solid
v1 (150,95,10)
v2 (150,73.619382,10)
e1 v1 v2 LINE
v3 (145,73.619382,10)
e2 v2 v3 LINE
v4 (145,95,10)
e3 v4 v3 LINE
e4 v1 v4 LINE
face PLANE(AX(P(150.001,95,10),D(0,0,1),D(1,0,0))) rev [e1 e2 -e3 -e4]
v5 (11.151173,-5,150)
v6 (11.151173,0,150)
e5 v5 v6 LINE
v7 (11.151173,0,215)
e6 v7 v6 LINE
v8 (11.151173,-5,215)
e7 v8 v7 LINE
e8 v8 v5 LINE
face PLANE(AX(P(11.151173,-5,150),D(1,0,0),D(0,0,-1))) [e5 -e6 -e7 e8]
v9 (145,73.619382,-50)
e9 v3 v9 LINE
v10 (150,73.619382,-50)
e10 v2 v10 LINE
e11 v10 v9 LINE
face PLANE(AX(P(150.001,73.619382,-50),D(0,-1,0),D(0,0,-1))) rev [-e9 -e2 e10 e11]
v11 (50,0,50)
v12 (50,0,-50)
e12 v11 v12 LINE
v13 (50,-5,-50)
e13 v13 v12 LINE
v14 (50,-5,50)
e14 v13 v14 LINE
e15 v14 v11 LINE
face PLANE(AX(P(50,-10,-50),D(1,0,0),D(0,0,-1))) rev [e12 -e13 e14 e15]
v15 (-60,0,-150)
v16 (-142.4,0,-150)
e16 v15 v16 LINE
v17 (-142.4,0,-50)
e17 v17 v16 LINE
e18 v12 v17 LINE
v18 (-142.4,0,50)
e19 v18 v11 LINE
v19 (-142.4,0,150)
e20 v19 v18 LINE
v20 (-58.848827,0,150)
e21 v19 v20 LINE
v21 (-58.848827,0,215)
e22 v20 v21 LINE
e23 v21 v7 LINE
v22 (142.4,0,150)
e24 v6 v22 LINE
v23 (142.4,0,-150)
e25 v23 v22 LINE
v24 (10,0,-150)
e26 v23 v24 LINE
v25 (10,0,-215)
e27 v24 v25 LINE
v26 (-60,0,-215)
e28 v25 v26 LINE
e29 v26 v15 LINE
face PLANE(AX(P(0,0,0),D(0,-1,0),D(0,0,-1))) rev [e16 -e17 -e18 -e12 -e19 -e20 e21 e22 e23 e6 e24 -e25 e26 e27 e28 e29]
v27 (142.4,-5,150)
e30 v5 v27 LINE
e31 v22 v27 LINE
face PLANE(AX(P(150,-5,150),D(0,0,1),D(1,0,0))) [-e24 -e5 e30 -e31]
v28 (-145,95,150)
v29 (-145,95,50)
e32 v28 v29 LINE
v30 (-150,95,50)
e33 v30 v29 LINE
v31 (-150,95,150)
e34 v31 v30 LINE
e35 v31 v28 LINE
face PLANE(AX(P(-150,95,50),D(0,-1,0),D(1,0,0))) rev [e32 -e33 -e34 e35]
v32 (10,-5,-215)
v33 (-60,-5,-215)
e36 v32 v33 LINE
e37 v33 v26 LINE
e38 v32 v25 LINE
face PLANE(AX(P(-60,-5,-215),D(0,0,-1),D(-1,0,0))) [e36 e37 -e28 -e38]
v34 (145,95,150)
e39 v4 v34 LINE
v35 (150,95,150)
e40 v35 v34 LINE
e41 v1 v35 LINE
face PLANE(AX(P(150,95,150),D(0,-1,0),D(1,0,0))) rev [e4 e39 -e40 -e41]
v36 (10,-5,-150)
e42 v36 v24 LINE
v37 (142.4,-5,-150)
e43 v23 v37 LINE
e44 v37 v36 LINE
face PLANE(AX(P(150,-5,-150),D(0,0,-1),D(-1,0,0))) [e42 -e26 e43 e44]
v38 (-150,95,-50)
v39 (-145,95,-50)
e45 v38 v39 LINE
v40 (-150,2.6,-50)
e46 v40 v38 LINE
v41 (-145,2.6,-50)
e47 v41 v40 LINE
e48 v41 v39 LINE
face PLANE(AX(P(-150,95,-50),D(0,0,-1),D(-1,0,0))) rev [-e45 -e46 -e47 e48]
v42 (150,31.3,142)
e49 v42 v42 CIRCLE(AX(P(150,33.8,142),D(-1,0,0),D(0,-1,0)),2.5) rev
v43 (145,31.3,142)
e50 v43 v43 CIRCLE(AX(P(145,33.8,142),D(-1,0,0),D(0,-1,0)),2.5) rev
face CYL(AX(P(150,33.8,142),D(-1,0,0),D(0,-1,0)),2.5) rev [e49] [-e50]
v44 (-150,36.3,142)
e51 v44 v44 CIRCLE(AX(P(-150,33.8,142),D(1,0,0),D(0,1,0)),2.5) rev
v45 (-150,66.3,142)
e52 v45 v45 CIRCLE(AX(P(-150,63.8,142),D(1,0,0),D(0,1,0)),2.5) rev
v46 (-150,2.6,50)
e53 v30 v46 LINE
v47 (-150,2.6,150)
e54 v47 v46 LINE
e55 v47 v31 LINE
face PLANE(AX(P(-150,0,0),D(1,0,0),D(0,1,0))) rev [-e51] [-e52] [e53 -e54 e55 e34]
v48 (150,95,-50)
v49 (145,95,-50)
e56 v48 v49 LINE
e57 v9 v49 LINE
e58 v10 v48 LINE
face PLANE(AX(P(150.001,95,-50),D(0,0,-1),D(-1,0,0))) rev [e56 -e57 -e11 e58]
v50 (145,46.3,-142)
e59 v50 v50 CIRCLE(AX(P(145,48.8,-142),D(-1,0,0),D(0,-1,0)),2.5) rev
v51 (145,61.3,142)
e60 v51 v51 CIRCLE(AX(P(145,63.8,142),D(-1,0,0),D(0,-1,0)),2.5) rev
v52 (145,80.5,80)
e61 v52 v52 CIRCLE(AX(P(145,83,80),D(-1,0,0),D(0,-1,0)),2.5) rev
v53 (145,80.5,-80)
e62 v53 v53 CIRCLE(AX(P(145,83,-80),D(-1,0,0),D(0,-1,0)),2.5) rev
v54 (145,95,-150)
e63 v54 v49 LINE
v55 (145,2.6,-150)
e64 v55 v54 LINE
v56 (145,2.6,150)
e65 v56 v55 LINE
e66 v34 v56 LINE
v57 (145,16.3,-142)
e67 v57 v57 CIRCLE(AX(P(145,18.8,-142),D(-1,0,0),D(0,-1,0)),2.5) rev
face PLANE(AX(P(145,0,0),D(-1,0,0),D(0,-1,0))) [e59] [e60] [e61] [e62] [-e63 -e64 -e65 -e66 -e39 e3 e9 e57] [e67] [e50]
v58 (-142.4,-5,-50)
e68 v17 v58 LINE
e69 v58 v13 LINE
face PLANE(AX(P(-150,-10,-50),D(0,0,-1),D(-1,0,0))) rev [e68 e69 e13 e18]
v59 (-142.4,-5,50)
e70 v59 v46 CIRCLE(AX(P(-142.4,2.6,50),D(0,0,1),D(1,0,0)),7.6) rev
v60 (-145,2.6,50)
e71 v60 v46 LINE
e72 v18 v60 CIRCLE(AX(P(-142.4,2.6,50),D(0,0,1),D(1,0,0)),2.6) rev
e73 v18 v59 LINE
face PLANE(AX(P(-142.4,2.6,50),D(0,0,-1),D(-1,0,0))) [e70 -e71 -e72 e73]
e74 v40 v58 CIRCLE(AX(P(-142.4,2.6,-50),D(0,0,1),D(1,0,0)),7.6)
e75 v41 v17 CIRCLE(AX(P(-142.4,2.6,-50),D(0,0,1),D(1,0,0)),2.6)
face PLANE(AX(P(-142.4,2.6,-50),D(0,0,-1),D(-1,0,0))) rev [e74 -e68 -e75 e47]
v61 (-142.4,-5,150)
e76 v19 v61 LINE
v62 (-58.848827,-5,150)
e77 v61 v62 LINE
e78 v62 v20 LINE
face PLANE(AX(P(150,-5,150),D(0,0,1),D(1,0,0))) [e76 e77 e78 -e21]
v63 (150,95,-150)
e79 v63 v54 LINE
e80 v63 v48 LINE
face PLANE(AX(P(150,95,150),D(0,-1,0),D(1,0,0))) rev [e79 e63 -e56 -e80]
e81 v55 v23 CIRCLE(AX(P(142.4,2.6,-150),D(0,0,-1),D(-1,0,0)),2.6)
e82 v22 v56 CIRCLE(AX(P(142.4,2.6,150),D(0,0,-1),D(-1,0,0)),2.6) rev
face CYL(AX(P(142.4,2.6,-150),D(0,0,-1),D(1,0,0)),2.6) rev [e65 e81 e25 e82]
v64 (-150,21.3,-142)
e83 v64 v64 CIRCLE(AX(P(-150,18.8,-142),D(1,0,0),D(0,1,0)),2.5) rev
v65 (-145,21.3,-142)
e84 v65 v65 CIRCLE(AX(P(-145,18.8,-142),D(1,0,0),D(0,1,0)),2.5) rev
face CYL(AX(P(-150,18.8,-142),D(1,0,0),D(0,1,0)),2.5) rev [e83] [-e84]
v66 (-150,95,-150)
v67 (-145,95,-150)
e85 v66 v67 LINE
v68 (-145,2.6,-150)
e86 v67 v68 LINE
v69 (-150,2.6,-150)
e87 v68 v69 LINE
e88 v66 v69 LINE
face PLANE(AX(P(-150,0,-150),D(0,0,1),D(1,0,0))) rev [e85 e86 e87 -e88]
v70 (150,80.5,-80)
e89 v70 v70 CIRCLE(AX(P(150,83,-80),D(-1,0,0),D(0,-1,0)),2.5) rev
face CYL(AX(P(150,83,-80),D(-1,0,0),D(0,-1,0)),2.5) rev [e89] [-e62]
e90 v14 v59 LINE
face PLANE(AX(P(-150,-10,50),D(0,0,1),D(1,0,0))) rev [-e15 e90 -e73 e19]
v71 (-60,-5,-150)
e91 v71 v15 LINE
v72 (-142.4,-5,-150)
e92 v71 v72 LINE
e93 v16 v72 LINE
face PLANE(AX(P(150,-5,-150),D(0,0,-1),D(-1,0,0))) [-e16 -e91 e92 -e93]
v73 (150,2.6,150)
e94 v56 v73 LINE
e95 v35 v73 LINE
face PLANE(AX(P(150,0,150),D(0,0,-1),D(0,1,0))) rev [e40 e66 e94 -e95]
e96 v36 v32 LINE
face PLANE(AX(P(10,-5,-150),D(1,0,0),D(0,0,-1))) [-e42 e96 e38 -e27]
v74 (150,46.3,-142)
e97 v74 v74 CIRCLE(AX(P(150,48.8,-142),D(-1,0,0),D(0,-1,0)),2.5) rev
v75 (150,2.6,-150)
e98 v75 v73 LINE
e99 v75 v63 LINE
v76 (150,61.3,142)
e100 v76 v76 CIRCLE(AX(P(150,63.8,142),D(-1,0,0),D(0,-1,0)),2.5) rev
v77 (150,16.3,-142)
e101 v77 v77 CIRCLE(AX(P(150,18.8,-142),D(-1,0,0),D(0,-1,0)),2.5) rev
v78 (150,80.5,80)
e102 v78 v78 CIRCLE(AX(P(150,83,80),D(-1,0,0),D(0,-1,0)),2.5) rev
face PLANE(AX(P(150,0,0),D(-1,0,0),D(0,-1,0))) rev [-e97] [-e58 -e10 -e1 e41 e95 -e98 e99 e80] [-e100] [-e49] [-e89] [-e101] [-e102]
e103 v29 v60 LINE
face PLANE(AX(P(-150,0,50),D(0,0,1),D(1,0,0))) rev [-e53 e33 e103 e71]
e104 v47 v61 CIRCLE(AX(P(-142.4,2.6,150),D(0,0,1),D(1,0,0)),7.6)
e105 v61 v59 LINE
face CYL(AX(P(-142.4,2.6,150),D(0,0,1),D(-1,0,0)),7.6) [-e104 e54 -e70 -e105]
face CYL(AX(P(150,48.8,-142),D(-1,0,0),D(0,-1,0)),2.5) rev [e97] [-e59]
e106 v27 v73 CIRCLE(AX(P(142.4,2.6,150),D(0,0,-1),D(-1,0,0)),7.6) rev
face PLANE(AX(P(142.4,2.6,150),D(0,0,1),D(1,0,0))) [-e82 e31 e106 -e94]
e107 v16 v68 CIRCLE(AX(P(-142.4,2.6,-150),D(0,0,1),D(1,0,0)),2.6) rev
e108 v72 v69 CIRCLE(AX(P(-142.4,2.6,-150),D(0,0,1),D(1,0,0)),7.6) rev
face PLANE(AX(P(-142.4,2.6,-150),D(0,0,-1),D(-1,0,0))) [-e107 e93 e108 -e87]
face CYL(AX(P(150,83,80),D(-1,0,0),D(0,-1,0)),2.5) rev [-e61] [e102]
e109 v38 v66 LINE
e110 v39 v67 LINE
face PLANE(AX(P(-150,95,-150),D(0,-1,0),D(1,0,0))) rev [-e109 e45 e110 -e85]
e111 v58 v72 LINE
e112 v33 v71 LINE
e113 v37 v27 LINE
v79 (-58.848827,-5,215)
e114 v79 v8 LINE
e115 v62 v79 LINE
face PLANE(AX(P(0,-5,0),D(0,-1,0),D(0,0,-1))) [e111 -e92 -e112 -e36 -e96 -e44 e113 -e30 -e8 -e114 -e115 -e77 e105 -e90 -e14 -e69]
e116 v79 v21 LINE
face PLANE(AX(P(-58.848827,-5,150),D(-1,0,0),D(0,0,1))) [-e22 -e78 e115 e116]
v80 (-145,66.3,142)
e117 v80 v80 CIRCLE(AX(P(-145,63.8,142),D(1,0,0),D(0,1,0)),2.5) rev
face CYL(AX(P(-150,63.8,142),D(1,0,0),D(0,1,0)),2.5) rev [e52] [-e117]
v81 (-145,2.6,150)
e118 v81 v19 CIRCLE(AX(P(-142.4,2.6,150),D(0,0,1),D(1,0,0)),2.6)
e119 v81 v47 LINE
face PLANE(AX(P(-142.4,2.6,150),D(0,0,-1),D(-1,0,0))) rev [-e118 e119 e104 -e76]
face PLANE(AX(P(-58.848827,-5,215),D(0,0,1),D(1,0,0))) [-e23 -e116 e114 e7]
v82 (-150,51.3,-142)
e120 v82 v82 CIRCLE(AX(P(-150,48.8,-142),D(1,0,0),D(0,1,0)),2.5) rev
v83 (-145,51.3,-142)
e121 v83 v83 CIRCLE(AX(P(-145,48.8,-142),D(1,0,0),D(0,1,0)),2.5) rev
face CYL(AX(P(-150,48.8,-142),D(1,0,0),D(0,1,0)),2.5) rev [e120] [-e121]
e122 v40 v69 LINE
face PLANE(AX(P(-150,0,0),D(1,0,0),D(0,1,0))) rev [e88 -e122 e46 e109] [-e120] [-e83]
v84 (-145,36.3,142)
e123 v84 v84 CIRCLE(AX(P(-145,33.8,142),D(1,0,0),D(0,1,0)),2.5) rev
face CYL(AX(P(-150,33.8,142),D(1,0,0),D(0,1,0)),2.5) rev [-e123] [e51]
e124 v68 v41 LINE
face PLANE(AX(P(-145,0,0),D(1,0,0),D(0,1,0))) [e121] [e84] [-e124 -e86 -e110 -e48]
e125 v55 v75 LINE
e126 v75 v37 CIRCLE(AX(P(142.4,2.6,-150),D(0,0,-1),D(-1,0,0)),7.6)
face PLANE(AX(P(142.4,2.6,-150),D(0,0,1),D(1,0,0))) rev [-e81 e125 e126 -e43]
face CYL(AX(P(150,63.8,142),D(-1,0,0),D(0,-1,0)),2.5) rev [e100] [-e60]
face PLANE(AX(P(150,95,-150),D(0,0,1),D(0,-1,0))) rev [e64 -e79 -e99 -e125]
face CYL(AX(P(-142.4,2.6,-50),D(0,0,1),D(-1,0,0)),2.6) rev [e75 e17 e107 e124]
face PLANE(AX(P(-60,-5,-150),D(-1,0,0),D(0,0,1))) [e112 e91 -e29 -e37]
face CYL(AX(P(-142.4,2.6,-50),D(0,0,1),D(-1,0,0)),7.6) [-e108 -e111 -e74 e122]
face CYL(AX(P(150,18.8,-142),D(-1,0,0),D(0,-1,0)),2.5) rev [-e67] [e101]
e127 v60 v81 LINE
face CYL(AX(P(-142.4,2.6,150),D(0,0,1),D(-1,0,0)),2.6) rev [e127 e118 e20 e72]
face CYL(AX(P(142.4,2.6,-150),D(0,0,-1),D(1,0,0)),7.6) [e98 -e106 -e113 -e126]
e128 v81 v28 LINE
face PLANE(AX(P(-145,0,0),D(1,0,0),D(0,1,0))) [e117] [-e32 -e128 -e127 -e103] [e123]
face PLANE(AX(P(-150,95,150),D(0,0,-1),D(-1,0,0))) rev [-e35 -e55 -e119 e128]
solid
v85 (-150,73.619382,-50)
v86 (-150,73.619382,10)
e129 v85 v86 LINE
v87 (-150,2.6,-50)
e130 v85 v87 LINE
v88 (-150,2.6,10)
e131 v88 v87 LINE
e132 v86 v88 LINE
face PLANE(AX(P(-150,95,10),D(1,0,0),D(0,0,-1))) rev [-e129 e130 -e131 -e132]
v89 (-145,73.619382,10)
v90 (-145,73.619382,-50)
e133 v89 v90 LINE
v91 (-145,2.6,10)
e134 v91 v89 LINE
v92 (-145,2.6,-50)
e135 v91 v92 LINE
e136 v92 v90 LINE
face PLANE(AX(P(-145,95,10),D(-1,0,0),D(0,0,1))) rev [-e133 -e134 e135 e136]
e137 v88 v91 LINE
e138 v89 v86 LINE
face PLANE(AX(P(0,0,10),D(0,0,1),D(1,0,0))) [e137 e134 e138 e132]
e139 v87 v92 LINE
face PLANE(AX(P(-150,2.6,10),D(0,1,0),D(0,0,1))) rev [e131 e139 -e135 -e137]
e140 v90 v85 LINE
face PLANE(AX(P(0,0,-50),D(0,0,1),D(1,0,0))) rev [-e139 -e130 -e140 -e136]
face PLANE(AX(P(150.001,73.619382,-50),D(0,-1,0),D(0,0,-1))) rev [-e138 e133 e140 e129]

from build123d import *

# Parameters (mm, degrees)
SKETCH1_W                    = 300
SKETCH1_H                    = 300
BASE_FLANGE1_DEPTH           = 5
EDGE_FLANGE1_STRIP_W         = 25.2
EDGE_FLANGE1_STRIP_H         = 5
EDGE_FLANGE1_STRIP_CUT_DEPTH = 300
EDGE_FLANGE1_DEPTH           = 300
EDGE_FLANGE1_PROFILE_W       = 300
EDGE_FLANGE1_PROFILE_H       = 92.4
EDGE_FLANGE1_PROFILE_R       = 2.5
EDGE_FLANGE1_FLAT_DEPTH      = 5
SKETCH9_W                    = 200
SKETCH9_H                    = 100
CUT_EXTRUDE1_DEPTH           = 10
SKETCH16_W                   = 70
SKETCH16_H                   = 65
TAB2_DEPTH                   = 5
EDGE_FLANGE3_STRIP_W         = 25.2
EDGE_FLANGE3_STRIP_H         = 5
EDGE_FLANGE3_STRIP_CUT_DEPTH = 100
EDGE_FLANGE3_DEPTH           = 100
EDGE_FLANGE3_PROFILE_W       = 100
EDGE_FLANGE3_PROFILE_H       = 92.4
EDGE_FLANGE3_PROFILE_R       = 2.5
EDGE_FLANGE3_FLAT_DEPTH      = 5
EDGE_FLANGE4_STRIP_W         = 25.2
EDGE_FLANGE4_STRIP_H         = 5
EDGE_FLANGE4_STRIP_CUT_DEPTH = 100
EDGE_FLANGE4_DEPTH           = 100
EDGE_FLANGE4_PROFILE_W       = 100
EDGE_FLANGE4_PROFILE_H       = 92.4
EDGE_FLANGE4_PROFILE_R       = 2.5
EDGE_FLANGE4_FLAT_DEPTH      = 5
SKETCH37_W                   = 5
SKETCH37_H                   = 92.4
BASE_FLANGE2_DEPTH           = 60
CUT_EXTRUDE2_DEPTH           = 5
CUT_EXTRUDE3_START           = -300
SKETCH41_W                   = 60
SKETCH41_H                   = 21.380618099
CUT_EXTRUDE3_DEPTH           = 300


# Sheet-metal steps are written as plain solids
with BuildPart() as part:
    # Sketch1 → Base-Flange1 (new body)
    with BuildSketch(Plane(origin=(0, 0, 0), x_dir=(1, 0, 0), z_dir=(0, 1, 0))):
        Rectangle(SKETCH1_W, SKETCH1_H)
    extrude(amount=-BASE_FLANGE1_DEPTH)

    # Edge-Flange1 strip (across the edge) → Edge-Flange1 strip cut (cut)
    with BuildSketch(Plane(origin=(150, 0, 150), x_dir=(-1, 0, 0), z_dir=(0, 0, -1))):
        with Locations((-5, -2.5)):
            Rectangle(EDGE_FLANGE1_STRIP_W, EDGE_FLANGE1_STRIP_H)
    extrude(amount=EDGE_FLANGE1_STRIP_CUT_DEPTH, mode=Mode.SUBTRACT)

    # Edge-Flange1 bend section (across the edge) → Edge-Flange1 (add)
    with BuildSketch(Plane(origin=(150, 0, 150), x_dir=(-1, 0, 0), z_dir=(0, 0, -1))):
        with BuildLine():
            Line((0, 2.6), (5, 2.6))
            ThreePointArc((5, 2.6), (5.761522369, 0.761522369), (7.6, 0))
            Line((7.6, 0), (7.6, -5))
            ThreePointArc((7.6, -5), (2.225988463, -2.774011537), (0, 2.6))
        make_face()
    extrude(amount=EDGE_FLANGE1_DEPTH)

    # Edge-Flange1 profile (on flange) → Edge-Flange1 flat (add)
    with BuildSketch(Plane(origin=(150, 0, 0), x_dir=(0, 0, -1), z_dir=(1, 0, 0))):
        with Locations((0, 48.8)):
            Rectangle(EDGE_FLANGE1_PROFILE_W, EDGE_FLANGE1_PROFILE_H)
        with Locations((-142, 33.8)):
            Circle(EDGE_FLANGE1_PROFILE_R, mode=Mode.SUBTRACT)
        with Locations((142, 18.8)):
            Circle(EDGE_FLANGE1_PROFILE_R, mode=Mode.SUBTRACT)
        with Locations((142, 48.8)):
            Circle(EDGE_FLANGE1_PROFILE_R, mode=Mode.SUBTRACT)
        with Locations((-142, 63.8)):
            Circle(EDGE_FLANGE1_PROFILE_R, mode=Mode.SUBTRACT)
        with Locations((-80, 83)):
            Circle(EDGE_FLANGE1_PROFILE_R, mode=Mode.SUBTRACT)
        with Locations((80, 83)):
            Circle(EDGE_FLANGE1_PROFILE_R, mode=Mode.SUBTRACT)
    extrude(amount=-EDGE_FLANGE1_FLAT_DEPTH)

    # Sketch9 → Cut-Extrude1 (cut)
    with BuildSketch(Plane(origin=(0, 0, 0), x_dir=(1, 0, 0), z_dir=(0, 1, 0))):
        with Locations((-50, 0)):
            Rectangle(SKETCH9_W, SKETCH9_H)
    extrude(amount=-CUT_EXTRUDE1_DEPTH, mode=Mode.SUBTRACT)

    # Sketch16 → Tab2 (add)
    with BuildSketch(Plane(origin=(0, 0, 0), x_dir=(1, 0, 0), z_dir=(0, 1, 0))):
        with Locations((-25, 182.5)):
            Rectangle(SKETCH16_W, SKETCH16_H)
        with Locations((-23.848827091, -182.5)):
            Rectangle(SKETCH16_W, SKETCH16_H)
    extrude(amount=-TAB2_DEPTH)

    # Edge-Flange3 strip (across the edge) → Edge-Flange3 strip cut (cut)
    with BuildSketch(Plane(origin=(-150, 0, 50), x_dir=(1, 0, 0), z_dir=(0, 0, 1))):
        with Locations((-5, -2.5)):
            Rectangle(EDGE_FLANGE3_STRIP_W, EDGE_FLANGE3_STRIP_H)
    extrude(amount=EDGE_FLANGE3_STRIP_CUT_DEPTH, mode=Mode.SUBTRACT)

    # Edge-Flange3 bend section (across the edge) → Edge-Flange3 (add)
    with BuildSketch(Plane(origin=(-150, 0, 50), x_dir=(1, 0, 0), z_dir=(0, 0, 1))):
        with BuildLine():
            Line((0, 2.6), (5, 2.6))
            ThreePointArc((5, 2.6), (5.761522369, 0.761522369), (7.6, 0))
            Line((7.6, 0), (7.6, -5))
            ThreePointArc((7.6, -5), (2.225988463, -2.774011537), (0, 2.6))
        make_face()
    extrude(amount=EDGE_FLANGE3_DEPTH)

    # Edge-Flange3 profile (on flange) → Edge-Flange3 flat (add)
    with BuildSketch(Plane.ZY.offset(150)):
        with Locations((100, 48.8)):
            Rectangle(EDGE_FLANGE3_PROFILE_W, EDGE_FLANGE3_PROFILE_H)
        with Locations((142, 33.8)):
            Circle(EDGE_FLANGE3_PROFILE_R, mode=Mode.SUBTRACT)
        with Locations((142, 63.8)):
            Circle(EDGE_FLANGE3_PROFILE_R, mode=Mode.SUBTRACT)
    extrude(amount=-EDGE_FLANGE3_FLAT_DEPTH)

    # Edge-Flange4 strip (across the edge) → Edge-Flange4 strip cut (cut)
    with BuildSketch(Plane(origin=(-150, 0, -150), x_dir=(1, 0, 0), z_dir=(0, 0, 1))):
        with Locations((-5, -2.5)):
            Rectangle(EDGE_FLANGE4_STRIP_W, EDGE_FLANGE4_STRIP_H)
    extrude(amount=EDGE_FLANGE4_STRIP_CUT_DEPTH, mode=Mode.SUBTRACT)

    # Edge-Flange4 bend section (across the edge) → Edge-Flange4 (add)
    with BuildSketch(Plane(origin=(-150, 0, -150), x_dir=(1, 0, 0), z_dir=(0, 0, 1))):
        with BuildLine():
            Line((0, 2.6), (5, 2.6))
            ThreePointArc((5, 2.6), (5.761522369, 0.761522369), (7.6, 0))
            Line((7.6, 0), (7.6, -5))
            ThreePointArc((7.6, -5), (2.225988463, -2.774011537), (0, 2.6))
        make_face()
    extrude(amount=EDGE_FLANGE4_DEPTH)

    # Edge-Flange4 profile (on flange) → Edge-Flange4 flat (add)
    with BuildSketch(Plane.ZY.offset(150)):
        with Locations((-100, 48.8)):
            Rectangle(EDGE_FLANGE4_PROFILE_W, EDGE_FLANGE4_PROFILE_H)
        with Locations((-142, 18.8)):
            Circle(EDGE_FLANGE4_PROFILE_R, mode=Mode.SUBTRACT)
        with Locations((-142, 48.8)):
            Circle(EDGE_FLANGE4_PROFILE_R, mode=Mode.SUBTRACT)
    extrude(amount=-EDGE_FLANGE4_FLAT_DEPTH)


with BuildPart() as body_2:
    # Sketch37 → Base-Flange2 (new body)
    with BuildSketch(Plane.XY.offset(-50)):
        with Locations((-147.5, 48.8)):
            Rectangle(SKETCH37_W, SKETCH37_H)
    extrude(amount=BASE_FLANGE2_DEPTH)

    # Sketch40 → Cut-Extrude2 (cut)
    with BuildSketch(Plane.ZY.offset(150)):
        with BuildLine():
            Line((-20, 95), (0, 95))
            ThreePointArc((0, 95), (-10, 85), (-20, 95))
        make_face()
    extrude(amount=-CUT_EXTRUDE2_DEPTH, mode=Mode.SUBTRACT)


with BuildPart() as cut_extrude3_tool:
    # Sketch41 → Cut-Extrude3 (new body)
    with BuildSketch(Plane.ZY.offset(150).offset(CUT_EXTRUDE3_START)):
        with Locations((-20, 84.30969095)):
            Rectangle(SKETCH41_W, SKETCH41_H)
    extrude(amount=CUT_EXTRUDE3_DEPTH)


with BuildPart() as part_1:
    add(part.part)

    # Cut-Extrude3: cut by cut_extrude3_tool
    add(cut_extrude3_tool.part, mode=Mode.SUBTRACT)


with BuildPart() as body_2_1:
    add(body_2.part)

    # Cut-Extrude3: cut by cut_extrude3_tool
    add(cut_extrude3_tool.part, mode=Mode.SUBTRACT)


solid = Compound([part_1.part, body_2_1.part])
